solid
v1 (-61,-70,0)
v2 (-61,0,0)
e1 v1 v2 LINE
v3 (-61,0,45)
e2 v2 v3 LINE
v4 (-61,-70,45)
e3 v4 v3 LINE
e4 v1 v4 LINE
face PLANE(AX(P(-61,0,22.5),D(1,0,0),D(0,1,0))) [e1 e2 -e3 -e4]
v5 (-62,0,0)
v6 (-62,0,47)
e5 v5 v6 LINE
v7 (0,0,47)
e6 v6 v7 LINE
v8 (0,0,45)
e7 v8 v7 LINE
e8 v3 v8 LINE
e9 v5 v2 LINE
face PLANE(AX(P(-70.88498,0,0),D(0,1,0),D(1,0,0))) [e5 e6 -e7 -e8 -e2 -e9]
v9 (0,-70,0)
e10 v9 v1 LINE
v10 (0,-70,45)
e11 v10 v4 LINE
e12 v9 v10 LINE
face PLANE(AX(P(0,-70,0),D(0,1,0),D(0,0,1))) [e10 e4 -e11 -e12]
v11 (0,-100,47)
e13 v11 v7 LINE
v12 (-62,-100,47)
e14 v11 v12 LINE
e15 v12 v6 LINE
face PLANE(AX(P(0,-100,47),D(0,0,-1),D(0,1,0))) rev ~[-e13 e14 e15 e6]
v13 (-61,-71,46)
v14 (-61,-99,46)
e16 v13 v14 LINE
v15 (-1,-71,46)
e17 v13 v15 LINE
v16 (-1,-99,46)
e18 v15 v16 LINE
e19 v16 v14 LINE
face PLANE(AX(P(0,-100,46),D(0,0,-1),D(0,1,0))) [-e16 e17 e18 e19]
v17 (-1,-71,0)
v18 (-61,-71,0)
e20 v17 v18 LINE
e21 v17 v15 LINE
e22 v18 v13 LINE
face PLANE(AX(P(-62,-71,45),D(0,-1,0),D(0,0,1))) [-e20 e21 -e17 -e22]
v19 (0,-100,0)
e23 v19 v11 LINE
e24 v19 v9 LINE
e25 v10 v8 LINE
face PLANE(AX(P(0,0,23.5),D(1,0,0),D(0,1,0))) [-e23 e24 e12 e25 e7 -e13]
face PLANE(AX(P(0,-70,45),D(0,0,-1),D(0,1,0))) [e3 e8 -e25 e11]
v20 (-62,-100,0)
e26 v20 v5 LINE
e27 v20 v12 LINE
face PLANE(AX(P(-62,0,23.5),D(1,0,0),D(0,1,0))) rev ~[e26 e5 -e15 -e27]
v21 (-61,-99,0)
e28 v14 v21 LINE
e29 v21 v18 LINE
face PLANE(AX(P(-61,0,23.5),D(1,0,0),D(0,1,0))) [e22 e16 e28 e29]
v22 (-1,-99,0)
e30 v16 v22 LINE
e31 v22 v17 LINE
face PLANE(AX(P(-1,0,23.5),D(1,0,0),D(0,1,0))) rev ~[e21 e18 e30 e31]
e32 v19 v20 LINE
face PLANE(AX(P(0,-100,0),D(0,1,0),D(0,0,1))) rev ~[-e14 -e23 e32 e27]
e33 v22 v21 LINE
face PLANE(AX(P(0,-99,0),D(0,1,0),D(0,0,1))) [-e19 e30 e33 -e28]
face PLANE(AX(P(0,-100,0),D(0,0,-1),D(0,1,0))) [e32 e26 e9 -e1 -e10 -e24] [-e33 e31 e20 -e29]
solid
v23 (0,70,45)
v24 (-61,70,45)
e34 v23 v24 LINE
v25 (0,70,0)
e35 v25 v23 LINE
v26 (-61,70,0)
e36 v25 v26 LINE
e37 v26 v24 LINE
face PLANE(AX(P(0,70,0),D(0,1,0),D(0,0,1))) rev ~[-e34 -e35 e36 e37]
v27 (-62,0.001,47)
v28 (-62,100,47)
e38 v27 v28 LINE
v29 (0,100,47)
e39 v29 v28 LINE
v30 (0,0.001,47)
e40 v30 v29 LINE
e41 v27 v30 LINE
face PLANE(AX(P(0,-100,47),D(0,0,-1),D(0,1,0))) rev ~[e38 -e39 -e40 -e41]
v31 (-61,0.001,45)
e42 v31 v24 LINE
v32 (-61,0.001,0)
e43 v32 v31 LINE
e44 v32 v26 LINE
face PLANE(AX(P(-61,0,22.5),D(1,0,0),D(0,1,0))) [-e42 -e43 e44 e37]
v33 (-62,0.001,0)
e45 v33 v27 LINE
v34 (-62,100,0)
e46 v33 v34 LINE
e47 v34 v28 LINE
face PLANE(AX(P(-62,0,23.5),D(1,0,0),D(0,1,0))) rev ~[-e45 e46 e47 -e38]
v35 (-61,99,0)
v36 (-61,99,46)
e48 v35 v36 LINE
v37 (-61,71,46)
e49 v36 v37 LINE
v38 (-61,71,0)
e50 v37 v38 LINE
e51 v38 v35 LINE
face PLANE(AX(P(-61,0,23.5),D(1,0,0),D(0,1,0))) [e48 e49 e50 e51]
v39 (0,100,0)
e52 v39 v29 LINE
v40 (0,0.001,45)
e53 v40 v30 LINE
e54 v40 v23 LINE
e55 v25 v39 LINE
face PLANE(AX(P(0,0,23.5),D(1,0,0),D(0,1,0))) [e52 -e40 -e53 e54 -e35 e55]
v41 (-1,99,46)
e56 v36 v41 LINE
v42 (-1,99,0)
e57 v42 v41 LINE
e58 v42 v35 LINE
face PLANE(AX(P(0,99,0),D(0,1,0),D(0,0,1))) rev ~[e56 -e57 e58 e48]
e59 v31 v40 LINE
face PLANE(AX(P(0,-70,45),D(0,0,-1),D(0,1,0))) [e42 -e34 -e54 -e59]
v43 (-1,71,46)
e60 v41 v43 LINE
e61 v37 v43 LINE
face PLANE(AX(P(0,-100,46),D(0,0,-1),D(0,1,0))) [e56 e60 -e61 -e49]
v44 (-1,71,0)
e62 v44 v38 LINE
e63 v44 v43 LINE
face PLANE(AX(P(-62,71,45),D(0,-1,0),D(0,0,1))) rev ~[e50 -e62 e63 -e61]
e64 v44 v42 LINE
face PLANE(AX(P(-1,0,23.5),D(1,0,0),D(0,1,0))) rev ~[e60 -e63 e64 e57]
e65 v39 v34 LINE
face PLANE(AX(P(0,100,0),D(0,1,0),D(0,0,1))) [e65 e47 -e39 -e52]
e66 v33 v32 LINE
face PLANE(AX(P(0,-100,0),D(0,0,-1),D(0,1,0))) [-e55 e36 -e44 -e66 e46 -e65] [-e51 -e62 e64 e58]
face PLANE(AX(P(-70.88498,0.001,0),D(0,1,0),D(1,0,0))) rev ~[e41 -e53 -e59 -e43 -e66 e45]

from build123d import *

# Parameters (mm, degrees)
F0_W        = 200
F0_H        = 47
F1_DEPTH    = 62
F2_W        = 140
F2_H        = 45
F3_DEPTH    = 61
F4_T        = 1
F4_T3_DEPTH = 63
F4_T5_DEPTH = 47
F4_T7_DEPTH = 142
F5_W        = 70.8849802613
F5_H        = 0.001
F6_DEPTH    = 120


# Not quite as in the source:
# - a shell that OpenCascade refuses in one call is made with other operations: the cavity is built on its own and cut out


with BuildPart() as f1:
    # F0 (on Right) → F1 (new body)
    with BuildSketch(Plane.YZ):
        with Locations((0, 23.5)):
            Rectangle(F0_W, F0_H)
    extrude(amount=-F1_DEPTH)

    # F2 (on face) → F3 (cut)
    with BuildSketch(Plane.YZ):
        with Locations((0, 22.5)):
            Rectangle(F2_W, F2_H)
    extrude(amount=-F3_DEPTH, mode=Mode.SUBTRACT)

    # F4: shell of thickness 1, made by hand


with BuildPart() as f4_core1:
    # F4_t2: copy of F1
    add(f1.part)

    # the walls: a layer under each face that stays
    f4_faces = [f4_core1.faces().sort_by_distance(p)[0] for p in [
        (-31, -100, 23.5),
        (-31, 0, 47),
        (0, -85.7142857143, 3.3571428571),
        (-62, 0, 23.5),
        (-31, 100, 23.5),
        (-30.5, -70, 22.5),
        (-61, 0, 22.5),
        (-30.5, 70, 22.5),
        (-30.5, 0, 45),
    ]]
    thicken(f4_faces, amount=-F4_T, mode=Mode.SUBTRACT)

    # F4_s4 → F4_t3 (cut)
    with BuildSketch(Plane.YZ.offset(-62)):
        Polygon((-69.99, 44.99), (-71, 45), (-71, 46), (-70, 46), align=None)
        Polygon((69.99, 44.99), (71, 45), (71, 46), (70, 46), align=None)
    extrude(amount=F4_T3_DEPTH, mode=Mode.SUBTRACT)

    # F4_s6 → F4_t5 (cut)
    with BuildSketch(Plane.XY.offset(-1)):
        Polygon((-60.99, -69.99), (-61, -71), (-62, -71), (-62, -70), align=None)
        Polygon((-60.99, 69.99), (-62, 70), (-62, 71), (-61, 71), align=None)
    extrude(amount=F4_T5_DEPTH, mode=Mode.SUBTRACT)

    # F4_s8 → F4_t7 (cut)
    with BuildSketch(Plane.XZ.offset(-71)):
        Polygon((-60.99, 44.99), (-62, 45), (-62, 46), (-61, 46), align=None)
    extrude(amount=F4_T7_DEPTH, mode=Mode.SUBTRACT)


with BuildPart() as f1_1:
    add(f1.part)

    # what is left inside the walls is the cavity
    f4_cavity = [f4_core1.part.solids().sort_by_distance(p)[0] for p in [
        (-41, -98.99, 23),
        (-41, 98.99, 23),
    ]]
    add(f4_cavity, mode=Mode.SUBTRACT)

    # F5 (on face) → F6 (cut)
    with BuildSketch(Plane(origin=(0, 0, 0), x_dir=(1, 0, 0), z_dir=(0, 0, -1))):
        with Locations((-35.4424901307, -0.0005)):
            Rectangle(F5_W, F5_H)
    extrude(amount=-F6_DEPTH, mode=Mode.SUBTRACT)


solid = f1_1.part
